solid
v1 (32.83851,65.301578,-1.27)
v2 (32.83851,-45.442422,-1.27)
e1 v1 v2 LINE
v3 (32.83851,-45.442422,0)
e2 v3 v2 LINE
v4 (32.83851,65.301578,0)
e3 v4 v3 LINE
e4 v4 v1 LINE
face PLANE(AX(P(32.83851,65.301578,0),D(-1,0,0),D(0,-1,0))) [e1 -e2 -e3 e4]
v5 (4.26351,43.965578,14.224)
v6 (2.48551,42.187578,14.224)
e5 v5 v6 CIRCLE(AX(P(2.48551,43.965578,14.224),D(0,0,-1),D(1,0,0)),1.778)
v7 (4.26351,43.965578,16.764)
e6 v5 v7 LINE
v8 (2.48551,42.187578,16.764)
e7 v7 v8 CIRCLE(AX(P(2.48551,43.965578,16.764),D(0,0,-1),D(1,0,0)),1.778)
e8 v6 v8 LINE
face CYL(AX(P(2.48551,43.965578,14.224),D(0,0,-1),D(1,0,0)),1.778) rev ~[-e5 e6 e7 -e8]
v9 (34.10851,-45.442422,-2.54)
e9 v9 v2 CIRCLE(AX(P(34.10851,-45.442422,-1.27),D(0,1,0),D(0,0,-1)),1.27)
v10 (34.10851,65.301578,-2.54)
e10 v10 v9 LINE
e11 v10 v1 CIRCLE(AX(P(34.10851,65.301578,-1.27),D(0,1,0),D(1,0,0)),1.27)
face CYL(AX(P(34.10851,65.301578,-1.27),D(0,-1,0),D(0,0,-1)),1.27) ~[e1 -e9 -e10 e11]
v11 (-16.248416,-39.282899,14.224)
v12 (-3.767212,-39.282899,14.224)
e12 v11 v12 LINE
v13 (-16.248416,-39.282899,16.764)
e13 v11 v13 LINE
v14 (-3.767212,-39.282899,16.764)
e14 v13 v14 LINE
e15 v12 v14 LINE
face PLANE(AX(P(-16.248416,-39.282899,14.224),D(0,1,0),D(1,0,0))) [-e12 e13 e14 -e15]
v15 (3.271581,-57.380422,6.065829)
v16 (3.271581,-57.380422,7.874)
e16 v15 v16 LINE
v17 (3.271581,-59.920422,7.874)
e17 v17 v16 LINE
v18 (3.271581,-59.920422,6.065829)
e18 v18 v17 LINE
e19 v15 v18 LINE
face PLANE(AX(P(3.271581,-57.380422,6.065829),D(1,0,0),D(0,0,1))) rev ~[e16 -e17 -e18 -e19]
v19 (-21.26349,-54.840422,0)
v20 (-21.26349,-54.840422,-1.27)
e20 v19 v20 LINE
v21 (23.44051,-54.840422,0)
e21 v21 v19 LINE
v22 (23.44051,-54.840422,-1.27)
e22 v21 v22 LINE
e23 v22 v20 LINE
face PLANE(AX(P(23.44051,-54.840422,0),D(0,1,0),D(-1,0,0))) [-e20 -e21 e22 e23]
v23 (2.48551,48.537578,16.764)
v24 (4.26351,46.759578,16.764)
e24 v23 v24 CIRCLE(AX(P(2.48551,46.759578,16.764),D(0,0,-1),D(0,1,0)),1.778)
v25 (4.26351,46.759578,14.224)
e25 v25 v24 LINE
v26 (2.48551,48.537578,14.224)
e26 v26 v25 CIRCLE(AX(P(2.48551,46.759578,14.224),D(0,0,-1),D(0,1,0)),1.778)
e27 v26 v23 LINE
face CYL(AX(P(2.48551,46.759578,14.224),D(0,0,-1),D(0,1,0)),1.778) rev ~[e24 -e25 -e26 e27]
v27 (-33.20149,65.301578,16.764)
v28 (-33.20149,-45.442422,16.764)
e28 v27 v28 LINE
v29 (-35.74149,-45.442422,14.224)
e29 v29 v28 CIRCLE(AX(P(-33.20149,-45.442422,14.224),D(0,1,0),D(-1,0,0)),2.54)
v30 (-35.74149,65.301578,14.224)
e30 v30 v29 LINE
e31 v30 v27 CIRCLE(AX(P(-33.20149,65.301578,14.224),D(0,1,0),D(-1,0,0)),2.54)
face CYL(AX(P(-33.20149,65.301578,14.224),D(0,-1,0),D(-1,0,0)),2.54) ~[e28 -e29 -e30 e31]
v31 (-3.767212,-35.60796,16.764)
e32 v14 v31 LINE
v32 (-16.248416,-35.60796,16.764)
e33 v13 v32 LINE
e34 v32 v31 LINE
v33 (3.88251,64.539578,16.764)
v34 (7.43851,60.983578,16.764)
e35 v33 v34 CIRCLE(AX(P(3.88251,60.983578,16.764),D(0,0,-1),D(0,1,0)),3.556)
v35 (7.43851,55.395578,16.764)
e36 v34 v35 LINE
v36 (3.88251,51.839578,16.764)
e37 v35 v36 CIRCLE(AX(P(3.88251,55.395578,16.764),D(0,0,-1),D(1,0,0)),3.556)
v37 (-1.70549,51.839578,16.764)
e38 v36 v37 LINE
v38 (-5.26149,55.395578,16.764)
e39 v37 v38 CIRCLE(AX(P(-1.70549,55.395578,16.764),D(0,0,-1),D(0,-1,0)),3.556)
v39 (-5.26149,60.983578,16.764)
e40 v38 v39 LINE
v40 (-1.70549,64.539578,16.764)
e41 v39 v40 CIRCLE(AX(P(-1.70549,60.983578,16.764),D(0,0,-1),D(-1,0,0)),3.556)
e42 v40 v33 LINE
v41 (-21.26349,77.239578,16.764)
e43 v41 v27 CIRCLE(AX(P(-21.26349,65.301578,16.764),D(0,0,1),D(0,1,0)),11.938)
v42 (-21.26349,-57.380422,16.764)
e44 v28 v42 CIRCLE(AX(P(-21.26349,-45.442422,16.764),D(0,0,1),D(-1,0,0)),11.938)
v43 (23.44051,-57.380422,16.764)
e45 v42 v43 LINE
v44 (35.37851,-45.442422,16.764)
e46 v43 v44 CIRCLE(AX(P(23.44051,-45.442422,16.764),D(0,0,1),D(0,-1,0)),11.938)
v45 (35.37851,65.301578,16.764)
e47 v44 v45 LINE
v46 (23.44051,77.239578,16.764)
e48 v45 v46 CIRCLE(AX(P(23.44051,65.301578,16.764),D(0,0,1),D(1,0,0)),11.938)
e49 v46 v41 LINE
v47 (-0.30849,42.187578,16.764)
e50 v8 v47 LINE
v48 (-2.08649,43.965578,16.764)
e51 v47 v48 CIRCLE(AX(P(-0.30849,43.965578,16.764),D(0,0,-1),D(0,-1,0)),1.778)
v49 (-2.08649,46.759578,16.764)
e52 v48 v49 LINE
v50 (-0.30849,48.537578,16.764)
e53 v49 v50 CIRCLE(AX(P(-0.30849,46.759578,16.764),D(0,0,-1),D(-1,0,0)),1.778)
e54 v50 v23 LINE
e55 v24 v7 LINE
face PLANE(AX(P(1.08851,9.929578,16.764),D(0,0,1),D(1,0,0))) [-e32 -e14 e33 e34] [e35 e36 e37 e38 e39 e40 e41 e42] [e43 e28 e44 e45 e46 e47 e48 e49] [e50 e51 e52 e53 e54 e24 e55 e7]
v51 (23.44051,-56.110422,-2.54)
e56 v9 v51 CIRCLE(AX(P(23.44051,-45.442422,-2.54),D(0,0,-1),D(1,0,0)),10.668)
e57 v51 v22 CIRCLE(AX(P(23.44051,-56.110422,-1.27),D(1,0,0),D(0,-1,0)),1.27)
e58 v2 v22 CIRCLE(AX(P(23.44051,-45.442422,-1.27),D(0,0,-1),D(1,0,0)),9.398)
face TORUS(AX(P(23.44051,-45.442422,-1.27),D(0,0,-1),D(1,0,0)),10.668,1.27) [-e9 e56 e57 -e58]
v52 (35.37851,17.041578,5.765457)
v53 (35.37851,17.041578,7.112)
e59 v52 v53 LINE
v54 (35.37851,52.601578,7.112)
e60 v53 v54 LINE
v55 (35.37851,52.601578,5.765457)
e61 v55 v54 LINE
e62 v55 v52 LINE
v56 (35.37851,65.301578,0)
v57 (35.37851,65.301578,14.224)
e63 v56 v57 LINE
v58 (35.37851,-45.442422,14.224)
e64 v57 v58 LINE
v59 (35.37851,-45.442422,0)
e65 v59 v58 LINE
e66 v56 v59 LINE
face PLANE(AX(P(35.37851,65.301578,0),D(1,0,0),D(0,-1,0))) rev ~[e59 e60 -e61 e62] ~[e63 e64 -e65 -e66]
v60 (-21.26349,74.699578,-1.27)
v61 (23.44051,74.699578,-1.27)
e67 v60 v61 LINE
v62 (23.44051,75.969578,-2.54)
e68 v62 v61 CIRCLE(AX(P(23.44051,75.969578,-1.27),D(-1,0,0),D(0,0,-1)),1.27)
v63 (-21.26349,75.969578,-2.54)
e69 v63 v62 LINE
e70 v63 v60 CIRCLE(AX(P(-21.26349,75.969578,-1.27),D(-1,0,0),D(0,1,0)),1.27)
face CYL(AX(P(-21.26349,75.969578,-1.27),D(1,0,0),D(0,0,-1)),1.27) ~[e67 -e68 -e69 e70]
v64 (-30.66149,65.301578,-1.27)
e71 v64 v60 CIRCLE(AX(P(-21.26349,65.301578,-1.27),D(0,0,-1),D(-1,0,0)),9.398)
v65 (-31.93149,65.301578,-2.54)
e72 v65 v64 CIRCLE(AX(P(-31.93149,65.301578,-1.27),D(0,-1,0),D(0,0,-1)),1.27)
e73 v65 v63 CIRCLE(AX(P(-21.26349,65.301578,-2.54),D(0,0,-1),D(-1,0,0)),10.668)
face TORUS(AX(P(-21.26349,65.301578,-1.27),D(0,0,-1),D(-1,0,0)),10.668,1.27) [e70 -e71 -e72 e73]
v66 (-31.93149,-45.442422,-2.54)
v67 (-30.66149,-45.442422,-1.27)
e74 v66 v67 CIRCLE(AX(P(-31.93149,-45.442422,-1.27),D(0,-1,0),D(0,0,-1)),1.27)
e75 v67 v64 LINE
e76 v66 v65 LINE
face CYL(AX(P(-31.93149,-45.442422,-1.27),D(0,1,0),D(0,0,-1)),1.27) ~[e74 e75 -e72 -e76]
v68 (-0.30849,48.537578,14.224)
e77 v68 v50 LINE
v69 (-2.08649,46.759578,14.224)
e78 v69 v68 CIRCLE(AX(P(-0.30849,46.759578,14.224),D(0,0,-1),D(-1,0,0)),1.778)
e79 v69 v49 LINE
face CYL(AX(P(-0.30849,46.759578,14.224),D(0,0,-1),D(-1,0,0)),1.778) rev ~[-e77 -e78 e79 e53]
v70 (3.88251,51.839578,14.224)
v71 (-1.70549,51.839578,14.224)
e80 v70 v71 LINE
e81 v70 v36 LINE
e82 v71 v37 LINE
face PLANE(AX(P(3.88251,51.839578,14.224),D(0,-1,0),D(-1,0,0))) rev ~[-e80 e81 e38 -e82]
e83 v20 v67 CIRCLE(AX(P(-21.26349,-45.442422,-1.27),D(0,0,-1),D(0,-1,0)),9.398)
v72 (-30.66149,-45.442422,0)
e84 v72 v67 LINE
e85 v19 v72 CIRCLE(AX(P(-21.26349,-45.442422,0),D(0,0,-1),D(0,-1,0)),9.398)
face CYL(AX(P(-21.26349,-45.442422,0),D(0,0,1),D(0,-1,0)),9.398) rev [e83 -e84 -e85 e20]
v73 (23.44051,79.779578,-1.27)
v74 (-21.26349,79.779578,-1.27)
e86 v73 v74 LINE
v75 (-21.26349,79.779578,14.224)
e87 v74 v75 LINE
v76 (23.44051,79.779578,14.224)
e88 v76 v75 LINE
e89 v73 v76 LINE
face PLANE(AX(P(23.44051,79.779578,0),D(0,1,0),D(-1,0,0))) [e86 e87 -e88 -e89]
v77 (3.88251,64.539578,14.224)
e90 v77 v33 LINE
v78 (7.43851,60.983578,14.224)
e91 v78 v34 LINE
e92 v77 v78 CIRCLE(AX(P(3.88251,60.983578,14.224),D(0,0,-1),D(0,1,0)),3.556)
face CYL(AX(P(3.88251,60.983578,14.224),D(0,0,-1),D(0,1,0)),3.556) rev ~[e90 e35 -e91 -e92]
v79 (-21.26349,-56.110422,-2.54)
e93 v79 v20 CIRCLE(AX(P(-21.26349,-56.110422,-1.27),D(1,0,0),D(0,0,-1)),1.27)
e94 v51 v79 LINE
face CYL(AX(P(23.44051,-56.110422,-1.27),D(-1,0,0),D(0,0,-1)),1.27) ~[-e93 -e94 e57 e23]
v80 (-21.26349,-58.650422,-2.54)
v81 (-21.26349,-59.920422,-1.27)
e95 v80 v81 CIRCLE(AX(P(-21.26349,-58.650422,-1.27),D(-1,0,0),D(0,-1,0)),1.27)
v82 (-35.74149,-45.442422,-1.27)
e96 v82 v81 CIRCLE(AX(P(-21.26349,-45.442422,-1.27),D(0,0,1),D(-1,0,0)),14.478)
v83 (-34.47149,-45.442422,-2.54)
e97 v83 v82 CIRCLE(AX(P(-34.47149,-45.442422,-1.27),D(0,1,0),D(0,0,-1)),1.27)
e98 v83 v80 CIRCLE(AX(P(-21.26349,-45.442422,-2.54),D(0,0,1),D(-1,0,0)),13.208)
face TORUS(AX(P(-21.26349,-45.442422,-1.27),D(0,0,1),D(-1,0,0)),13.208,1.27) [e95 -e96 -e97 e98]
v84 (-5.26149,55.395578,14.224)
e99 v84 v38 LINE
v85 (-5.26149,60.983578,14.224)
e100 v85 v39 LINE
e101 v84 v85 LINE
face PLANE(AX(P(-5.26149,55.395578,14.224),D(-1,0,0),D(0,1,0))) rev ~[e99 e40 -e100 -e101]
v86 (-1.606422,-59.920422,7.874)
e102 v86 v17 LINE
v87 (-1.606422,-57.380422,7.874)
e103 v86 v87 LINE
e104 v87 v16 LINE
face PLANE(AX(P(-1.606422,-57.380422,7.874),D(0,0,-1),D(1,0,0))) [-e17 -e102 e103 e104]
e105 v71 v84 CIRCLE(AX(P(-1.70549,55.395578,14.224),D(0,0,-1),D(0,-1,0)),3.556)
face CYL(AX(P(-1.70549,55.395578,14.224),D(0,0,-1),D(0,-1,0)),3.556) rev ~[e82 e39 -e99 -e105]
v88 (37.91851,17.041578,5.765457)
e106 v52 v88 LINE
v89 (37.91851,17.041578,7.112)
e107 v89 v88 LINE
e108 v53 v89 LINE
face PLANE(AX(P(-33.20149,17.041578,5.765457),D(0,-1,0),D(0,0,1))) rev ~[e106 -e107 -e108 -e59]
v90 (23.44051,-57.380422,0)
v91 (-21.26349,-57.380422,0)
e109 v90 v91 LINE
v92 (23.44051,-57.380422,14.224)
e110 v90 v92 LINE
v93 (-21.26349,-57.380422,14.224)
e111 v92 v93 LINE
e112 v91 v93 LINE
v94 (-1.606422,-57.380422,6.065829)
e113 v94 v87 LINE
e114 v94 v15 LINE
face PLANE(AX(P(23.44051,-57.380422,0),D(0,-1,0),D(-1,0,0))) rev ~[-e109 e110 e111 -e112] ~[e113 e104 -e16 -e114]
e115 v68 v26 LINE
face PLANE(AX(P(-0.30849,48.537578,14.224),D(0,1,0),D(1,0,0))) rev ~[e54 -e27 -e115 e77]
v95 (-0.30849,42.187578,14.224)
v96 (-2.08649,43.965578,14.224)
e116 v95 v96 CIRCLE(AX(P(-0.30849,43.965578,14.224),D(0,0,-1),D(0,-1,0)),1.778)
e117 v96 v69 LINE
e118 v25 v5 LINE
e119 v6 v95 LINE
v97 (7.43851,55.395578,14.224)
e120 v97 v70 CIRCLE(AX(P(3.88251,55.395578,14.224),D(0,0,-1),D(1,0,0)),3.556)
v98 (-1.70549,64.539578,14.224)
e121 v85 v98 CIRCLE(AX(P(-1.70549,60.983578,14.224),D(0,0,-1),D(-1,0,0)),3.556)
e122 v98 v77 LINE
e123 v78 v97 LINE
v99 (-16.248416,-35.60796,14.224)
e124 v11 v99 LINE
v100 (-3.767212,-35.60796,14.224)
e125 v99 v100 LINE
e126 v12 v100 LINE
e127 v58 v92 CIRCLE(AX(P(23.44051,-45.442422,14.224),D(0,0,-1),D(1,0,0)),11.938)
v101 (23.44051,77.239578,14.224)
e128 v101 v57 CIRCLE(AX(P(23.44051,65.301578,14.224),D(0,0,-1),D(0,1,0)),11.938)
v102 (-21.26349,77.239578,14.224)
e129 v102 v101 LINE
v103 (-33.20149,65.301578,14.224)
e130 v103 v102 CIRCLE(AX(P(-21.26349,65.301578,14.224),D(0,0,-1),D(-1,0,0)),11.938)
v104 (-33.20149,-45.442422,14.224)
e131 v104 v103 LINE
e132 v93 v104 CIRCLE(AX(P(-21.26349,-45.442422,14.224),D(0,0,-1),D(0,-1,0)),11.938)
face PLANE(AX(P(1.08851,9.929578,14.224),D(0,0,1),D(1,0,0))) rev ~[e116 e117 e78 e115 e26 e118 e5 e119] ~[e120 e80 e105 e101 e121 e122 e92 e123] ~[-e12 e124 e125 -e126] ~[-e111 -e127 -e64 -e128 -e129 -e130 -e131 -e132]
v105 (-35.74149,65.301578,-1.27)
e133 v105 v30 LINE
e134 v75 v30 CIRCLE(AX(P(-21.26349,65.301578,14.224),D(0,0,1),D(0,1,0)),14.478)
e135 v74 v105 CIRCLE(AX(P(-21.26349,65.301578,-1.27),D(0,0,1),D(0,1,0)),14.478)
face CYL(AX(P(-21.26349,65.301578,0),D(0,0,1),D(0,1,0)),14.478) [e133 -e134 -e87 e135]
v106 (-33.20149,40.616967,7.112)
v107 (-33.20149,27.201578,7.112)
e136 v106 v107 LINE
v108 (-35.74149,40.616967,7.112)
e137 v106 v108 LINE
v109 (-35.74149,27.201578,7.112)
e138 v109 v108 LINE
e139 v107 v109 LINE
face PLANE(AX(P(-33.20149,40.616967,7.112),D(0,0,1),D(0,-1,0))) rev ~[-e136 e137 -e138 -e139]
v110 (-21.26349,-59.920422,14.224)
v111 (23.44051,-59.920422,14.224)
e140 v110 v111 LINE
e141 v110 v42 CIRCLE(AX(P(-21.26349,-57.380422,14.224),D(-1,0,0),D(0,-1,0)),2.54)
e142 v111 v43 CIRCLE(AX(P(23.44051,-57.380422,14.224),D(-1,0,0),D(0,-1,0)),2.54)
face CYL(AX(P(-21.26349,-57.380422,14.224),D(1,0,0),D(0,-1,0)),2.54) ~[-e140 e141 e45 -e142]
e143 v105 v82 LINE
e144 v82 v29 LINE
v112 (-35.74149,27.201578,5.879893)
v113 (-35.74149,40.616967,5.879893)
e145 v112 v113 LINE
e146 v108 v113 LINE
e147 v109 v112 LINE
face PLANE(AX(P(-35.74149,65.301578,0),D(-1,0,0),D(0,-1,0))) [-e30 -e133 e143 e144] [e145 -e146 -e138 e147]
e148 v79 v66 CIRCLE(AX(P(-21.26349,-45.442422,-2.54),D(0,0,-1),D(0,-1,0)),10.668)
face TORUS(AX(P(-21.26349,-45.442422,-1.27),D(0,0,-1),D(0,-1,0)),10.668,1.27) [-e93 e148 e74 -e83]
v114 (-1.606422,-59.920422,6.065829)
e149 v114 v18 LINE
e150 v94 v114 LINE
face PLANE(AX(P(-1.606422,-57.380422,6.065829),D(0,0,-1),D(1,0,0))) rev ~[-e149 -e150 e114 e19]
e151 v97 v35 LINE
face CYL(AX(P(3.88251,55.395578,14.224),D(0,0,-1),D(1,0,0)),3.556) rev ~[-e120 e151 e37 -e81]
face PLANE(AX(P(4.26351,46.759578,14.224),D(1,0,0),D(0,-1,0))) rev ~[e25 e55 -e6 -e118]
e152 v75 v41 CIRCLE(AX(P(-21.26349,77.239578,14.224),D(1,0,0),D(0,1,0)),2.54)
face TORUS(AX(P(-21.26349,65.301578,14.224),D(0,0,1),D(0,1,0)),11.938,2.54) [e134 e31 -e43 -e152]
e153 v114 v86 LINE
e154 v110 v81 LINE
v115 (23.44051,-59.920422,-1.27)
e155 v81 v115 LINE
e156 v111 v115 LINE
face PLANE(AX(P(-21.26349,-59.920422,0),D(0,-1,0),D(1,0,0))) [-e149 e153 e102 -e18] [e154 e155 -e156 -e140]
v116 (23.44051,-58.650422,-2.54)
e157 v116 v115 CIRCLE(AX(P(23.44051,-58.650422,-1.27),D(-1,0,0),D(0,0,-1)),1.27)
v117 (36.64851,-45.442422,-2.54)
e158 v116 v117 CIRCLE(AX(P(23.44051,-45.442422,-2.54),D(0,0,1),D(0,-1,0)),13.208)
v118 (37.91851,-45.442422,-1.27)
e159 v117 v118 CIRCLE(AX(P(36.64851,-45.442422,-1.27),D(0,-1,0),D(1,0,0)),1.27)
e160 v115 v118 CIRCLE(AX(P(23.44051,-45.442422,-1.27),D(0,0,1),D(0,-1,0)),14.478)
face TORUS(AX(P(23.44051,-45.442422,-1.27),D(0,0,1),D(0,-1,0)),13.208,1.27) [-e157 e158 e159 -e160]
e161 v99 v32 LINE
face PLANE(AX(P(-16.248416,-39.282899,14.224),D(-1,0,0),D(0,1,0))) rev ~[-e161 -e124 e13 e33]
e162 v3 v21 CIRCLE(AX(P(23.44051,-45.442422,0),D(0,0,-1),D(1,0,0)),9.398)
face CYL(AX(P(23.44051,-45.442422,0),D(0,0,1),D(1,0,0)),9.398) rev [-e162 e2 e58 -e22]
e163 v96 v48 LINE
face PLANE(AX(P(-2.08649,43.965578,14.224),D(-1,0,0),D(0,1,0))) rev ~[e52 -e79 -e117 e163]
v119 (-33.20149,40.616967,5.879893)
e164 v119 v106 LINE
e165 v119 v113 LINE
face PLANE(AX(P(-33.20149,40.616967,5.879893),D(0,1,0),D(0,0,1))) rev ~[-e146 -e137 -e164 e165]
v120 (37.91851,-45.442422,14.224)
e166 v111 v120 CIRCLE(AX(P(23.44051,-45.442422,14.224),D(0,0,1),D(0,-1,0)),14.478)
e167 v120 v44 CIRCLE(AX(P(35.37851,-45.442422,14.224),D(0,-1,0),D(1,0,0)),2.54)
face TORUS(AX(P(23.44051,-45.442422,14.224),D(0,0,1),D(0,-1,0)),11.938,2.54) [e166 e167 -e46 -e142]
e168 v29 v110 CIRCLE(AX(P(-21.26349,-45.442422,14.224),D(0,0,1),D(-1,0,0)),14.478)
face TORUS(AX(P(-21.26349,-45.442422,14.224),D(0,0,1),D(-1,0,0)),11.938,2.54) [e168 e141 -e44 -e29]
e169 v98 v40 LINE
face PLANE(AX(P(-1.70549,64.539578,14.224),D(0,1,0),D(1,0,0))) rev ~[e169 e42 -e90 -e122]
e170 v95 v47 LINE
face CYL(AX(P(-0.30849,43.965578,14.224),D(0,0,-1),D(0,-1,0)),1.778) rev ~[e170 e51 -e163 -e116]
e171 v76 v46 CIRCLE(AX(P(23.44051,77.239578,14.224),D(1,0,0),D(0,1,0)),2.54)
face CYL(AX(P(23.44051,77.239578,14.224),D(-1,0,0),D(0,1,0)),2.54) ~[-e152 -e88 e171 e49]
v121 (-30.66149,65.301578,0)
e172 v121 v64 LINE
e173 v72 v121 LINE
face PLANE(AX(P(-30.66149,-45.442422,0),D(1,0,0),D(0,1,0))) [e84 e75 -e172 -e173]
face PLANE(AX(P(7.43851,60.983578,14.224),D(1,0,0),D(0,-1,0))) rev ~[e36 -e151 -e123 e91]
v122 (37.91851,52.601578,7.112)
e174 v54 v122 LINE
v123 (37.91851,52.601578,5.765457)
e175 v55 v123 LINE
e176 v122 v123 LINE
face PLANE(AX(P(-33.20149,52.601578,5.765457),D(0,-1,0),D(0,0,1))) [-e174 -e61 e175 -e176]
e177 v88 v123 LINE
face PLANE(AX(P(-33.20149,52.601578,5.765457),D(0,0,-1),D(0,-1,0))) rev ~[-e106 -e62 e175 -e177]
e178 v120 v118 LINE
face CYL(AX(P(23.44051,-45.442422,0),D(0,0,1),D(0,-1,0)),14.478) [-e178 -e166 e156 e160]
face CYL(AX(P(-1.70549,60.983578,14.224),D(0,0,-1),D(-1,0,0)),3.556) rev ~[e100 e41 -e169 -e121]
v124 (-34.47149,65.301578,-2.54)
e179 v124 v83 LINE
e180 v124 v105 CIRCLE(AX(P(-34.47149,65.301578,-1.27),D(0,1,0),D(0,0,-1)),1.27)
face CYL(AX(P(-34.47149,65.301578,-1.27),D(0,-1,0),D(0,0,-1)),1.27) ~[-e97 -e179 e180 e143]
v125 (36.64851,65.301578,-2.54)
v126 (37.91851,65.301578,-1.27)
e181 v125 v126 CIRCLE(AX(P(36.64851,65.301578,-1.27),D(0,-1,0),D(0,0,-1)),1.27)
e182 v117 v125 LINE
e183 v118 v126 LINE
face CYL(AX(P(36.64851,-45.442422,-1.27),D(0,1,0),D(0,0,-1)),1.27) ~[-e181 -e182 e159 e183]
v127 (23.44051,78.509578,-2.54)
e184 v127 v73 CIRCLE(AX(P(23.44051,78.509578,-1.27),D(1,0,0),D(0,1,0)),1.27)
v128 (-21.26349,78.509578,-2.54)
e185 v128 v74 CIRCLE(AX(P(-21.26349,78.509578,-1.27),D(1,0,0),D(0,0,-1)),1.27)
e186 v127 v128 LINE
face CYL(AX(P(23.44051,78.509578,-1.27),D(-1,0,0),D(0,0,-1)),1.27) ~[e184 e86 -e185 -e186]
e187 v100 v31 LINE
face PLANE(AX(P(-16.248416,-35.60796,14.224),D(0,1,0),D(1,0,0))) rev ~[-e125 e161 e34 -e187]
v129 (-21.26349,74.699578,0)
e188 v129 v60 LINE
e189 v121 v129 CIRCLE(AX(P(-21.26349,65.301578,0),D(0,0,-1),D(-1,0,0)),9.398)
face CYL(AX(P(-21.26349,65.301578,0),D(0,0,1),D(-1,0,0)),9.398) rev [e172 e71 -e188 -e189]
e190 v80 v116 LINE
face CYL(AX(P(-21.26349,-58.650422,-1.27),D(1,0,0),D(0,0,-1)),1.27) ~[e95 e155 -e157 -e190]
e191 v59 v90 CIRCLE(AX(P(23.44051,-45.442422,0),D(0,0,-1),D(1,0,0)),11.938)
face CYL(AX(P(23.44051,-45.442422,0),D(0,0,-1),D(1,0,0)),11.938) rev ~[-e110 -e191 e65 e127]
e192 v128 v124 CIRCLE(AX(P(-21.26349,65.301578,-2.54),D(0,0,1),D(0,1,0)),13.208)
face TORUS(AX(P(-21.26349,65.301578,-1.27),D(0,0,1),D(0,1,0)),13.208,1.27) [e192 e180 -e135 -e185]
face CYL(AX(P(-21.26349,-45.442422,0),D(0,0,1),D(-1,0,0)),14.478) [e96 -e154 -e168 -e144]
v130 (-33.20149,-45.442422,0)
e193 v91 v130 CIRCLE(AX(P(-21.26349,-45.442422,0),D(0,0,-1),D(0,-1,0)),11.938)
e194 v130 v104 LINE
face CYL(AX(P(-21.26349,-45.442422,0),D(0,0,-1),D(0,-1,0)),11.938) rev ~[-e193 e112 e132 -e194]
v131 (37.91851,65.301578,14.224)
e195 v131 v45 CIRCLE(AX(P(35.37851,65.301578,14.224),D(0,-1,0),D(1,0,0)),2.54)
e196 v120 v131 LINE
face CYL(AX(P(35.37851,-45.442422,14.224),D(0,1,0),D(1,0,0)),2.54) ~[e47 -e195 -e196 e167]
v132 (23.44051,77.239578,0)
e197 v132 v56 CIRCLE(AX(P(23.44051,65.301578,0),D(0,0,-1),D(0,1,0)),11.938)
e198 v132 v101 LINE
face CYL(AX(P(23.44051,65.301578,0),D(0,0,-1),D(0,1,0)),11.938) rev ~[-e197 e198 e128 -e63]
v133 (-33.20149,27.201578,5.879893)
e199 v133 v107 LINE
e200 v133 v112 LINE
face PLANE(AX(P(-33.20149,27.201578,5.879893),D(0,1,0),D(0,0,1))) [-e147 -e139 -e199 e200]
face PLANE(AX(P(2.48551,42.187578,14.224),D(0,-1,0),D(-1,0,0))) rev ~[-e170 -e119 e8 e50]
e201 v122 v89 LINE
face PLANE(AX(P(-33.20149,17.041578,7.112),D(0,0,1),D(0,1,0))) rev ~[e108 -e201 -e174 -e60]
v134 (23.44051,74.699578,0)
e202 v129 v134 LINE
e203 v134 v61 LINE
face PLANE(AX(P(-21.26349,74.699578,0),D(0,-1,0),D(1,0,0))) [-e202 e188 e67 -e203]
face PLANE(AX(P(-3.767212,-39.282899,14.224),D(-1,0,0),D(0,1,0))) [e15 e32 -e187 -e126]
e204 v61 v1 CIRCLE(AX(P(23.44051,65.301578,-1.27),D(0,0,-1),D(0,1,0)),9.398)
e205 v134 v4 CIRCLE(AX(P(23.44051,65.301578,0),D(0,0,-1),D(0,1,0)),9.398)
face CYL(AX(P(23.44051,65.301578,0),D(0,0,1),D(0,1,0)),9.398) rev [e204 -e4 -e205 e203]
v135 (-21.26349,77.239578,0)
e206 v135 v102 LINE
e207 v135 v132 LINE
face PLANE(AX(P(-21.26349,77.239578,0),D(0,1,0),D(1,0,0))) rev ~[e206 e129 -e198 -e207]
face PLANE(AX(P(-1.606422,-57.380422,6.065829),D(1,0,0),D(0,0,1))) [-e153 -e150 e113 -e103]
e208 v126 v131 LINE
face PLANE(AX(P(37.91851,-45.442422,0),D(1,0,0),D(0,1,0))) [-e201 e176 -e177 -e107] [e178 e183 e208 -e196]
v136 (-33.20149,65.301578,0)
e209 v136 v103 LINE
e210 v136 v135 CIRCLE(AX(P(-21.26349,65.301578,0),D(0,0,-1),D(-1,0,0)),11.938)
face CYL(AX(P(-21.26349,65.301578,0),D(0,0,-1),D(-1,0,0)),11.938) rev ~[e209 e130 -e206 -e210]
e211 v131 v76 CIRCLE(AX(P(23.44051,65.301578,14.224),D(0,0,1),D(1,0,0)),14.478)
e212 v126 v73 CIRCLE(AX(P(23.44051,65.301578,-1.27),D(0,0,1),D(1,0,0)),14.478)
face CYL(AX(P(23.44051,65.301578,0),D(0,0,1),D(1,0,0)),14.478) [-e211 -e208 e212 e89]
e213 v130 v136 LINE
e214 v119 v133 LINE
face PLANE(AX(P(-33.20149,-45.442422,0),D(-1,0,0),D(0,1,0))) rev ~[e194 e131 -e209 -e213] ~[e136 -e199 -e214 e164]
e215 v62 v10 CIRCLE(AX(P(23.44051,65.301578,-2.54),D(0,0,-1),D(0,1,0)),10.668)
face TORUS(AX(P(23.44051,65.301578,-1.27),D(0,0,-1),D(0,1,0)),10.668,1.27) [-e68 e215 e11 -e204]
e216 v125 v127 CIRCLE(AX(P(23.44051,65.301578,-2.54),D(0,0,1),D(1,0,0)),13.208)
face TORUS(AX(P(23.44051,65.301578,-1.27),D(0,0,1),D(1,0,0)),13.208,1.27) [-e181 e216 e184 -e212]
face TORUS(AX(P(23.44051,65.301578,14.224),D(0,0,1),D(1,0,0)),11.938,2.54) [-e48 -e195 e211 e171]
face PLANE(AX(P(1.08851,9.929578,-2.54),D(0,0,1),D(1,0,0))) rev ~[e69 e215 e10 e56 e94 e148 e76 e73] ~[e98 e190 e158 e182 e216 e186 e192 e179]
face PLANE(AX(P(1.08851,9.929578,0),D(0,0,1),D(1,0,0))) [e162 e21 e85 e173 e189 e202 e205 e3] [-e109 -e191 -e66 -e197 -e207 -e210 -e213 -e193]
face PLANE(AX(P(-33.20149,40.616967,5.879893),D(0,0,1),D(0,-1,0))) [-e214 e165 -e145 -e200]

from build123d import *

# Parameters (mm, degrees)
F1_DEPTH   = 14.224
F2_W       = 16.002
F2_H       = 1.3465428281
F2_W_2     = 9.398
F2_W_3     = 10.16
F3_DEPTH   = 76.2
F4_W       = 13.4153888345
F4_H       = 1.2321065667
F5_DEPTH   = 25.4
F7_DEPTH   = 14.224
F1_FACE2_W = 12.4812044669
F1_FACE2_H = 3.6749392748
F8_DEPTH   = 2.54
F9_DEPTH   = 2.54
F11_R      = 1.27
F6_W       = 4.8780030338
F6_H       = 1.8081708086
F12_DEPTH  = 7.1882
F13_R      = 2.54


with BuildPart() as f1:
    # F0 (on Top) → F1 (new body)
    with BuildSketch(Plane.XY):
        with BuildLine():
            Line((1.0885104024, 77.2395779495), (-21.2634895976, 77.2395779495))
            ThreePointArc((-21.2634895976, 77.2395779495), (-29.7049303514, 73.7430187033), (-33.2014895976, 65.3015779495))
            Line((-33.2014895976, 65.3015779495), (-33.2014895976, -45.4424220505))
            ThreePointArc((-33.2014895976, -45.4424220505), (-29.7049303514, -53.8838628043), (-21.2634895976, -57.3804220505))
            Line((-21.2634895976, -57.3804220505), (1.0885104024, -57.3804220505))
            Line((1.0885104024, -57.3804220505), (1.0885104024, -54.8404220505))
            Line((1.0885104024, -54.8404220505), (-21.2634895976, -54.8404220505))
            ThreePointArc((-21.2634895976, -54.8404220505), (-27.9088791272, -52.0878115801), (-30.6614895976, -45.4424220505))
            Line((-30.6614895976, -45.4424220505), (-30.6614895976, 65.3015779495))
            ThreePointArc((-30.6614895976, 65.3015779495), (-27.9088791272, 71.9469674791), (-21.2634895976, 74.6995779495))
            Line((-21.2634895976, 74.6995779495), (1.0885104024, 74.6995779495))
            Line((1.0885104024, 74.6995779495), (1.0885104024, 77.2395779495))
        make_face()
        with BuildLine():
            Line((23.4405104024, 77.2395779495), (1.0885104024, 77.2395779495))
            Line((1.0885104024, 77.2395779495), (1.0885104024, 74.6995779495))
            Line((1.0885104024, 74.6995779495), (23.4405104024, 74.6995779495))
            ThreePointArc((23.4405104024, 74.6995779495), (30.085899932, 71.9469674791), (32.8385104024, 65.3015779495))
            Line((32.8385104024, 65.3015779495), (32.8385104024, -45.4424220505))
            ThreePointArc((32.8385104024, -45.4424220505), (30.085899932, -52.0878115801), (23.4405104024, -54.8404220505))
            Line((23.4405104024, -54.8404220505), (1.0885104024, -54.8404220505))
            Line((1.0885104024, -54.8404220505), (1.0885104024, -57.3804220505))
            Line((1.0885104024, -57.3804220505), (23.4405104024, -57.3804220505))
            ThreePointArc((23.4405104024, -57.3804220505), (31.8819511562, -53.8838628043), (35.3785104024, -45.4424220505))
            Line((35.3785104024, -45.4424220505), (35.3785104024, 65.3015779495))
            ThreePointArc((35.3785104024, 65.3015779495), (31.8819511562, 73.7430187033), (23.4405104024, 77.2395779495))
        make_face()
        with BuildLine():
            Line((23.4405104024, 74.6995779495), (1.0885104024, 74.6995779495))
            Line((1.0885104024, 74.6995779495), (1.0885104024, 64.5395779495))
            Line((1.0885104024, 64.5395779495), (3.8825104024, 64.5395779495))
            ThreePointArc((3.8825104024, 64.5395779495), (6.3969821163, 63.4980496634), (7.4385104024, 60.9835779495))
            Line((7.4385104024, 60.9835779495), (7.4385104024, 55.3955779495))
            ThreePointArc((7.4385104024, 55.3955779495), (6.3969821163, 52.8811062356), (3.8825104024, 51.8395779495))
            Line((3.8825104024, 51.8395779495), (1.0885104024, 51.8395779495))
            Line((1.0885104024, 51.8395779495), (1.0885104024, 48.5375779495))
            Line((1.0885104024, 48.5375779495), (2.4855104024, 48.5375779495))
            ThreePointArc((2.4855104024, 48.5375779495), (3.7427462594, 48.0168138065), (4.2635104024, 46.7595779495))
            Line((4.2635104024, 46.7595779495), (4.2635104024, 43.9655779495))
            ThreePointArc((4.2635104024, 43.9655779495), (3.7427462594, 42.7083420926), (2.4855104024, 42.1875779495))
            Line((2.4855104024, 42.1875779495), (1.0885104024, 42.1875779495))
            Line((1.0885104024, 42.1875779495), (1.0885104024, -54.8404220505))
            Line((1.0885104024, -54.8404220505), (23.4405104024, -54.8404220505))
            ThreePointArc((23.4405104024, -54.8404220505), (30.085899932, -52.0878115801), (32.8385104024, -45.4424220505))
            Line((32.8385104024, -45.4424220505), (32.8385104024, 65.3015779495))
            ThreePointArc((32.8385104024, 65.3015779495), (30.085899932, 71.9469674791), (23.4405104024, 74.6995779495))
        make_face()
        with BuildLine():
            Line((1.0885104024, 64.5395779495), (1.0885104024, 74.6995779495))
            Line((1.0885104024, 74.6995779495), (-21.2634895976, 74.6995779495))
            ThreePointArc((-21.2634895976, 74.6995779495), (-27.9088791272, 71.9469674791), (-30.6614895976, 65.3015779495))
            Line((-30.6614895976, 65.3015779495), (-30.6614895976, -45.4424220505))
            ThreePointArc((-30.6614895976, -45.4424220505), (-27.9088791272, -52.0878115801), (-21.2634895976, -54.8404220505))
            Line((-21.2634895976, -54.8404220505), (1.0885104024, -54.8404220505))
            Line((1.0885104024, -54.8404220505), (1.0885104024, 42.1875779495))
            Line((1.0885104024, 42.1875779495), (-0.3084895976, 42.1875779495))
            ThreePointArc((-0.3084895976, 42.1875779495), (-1.5657254545, 42.7083420926), (-2.0864895976, 43.9655779495))
            Line((-2.0864895976, 43.9655779495), (-2.0864895976, 46.7595779495))
            ThreePointArc((-2.0864895976, 46.7595779495), (-1.5657254545, 48.0168138065), (-0.3084895976, 48.5375779495))
            Line((-0.3084895976, 48.5375779495), (1.0885104024, 48.5375779495))
            Line((1.0885104024, 48.5375779495), (1.0885104024, 51.8395779495))
            Line((1.0885104024, 51.8395779495), (-1.7054895976, 51.8395779495))
            ThreePointArc((-1.7054895976, 51.8395779495), (-4.2199613115, 52.8811062356), (-5.2614895976, 55.3955779495))
            Line((-5.2614895976, 55.3955779495), (-5.2614895976, 60.9835779495))
            ThreePointArc((-5.2614895976, 60.9835779495), (-4.2199613115, 63.4980496634), (-1.7054895976, 64.5395779495))
            Line((-1.7054895976, 64.5395779495), (1.0885104024, 64.5395779495))
        make_face()
        Polygon((-16.2484161556, -39.2828993499), (-16.2484161556, -37.4030255506), (-16.2484161556, -35.6079600751), (-3.7672116887, -35.6079600751), (-3.7672116887, -39.2828993499), align=None, mode=Mode.SUBTRACT)
    extrude(amount=F1_DEPTH)

    # F2 (on face) → F3 (join)
    with BuildSketch(Plane(origin=(-33.2014895976, 0, 0), x_dir=(0, -1, 0), z_dir=(-1, 0, 0))):
        with Locations((-44.6005779495, 6.438728586)):
            Rectangle(F2_W, F2_H)
        with Locations((-31.9005779495, 6.438728586)):
            Rectangle(F2_W_2, F2_H)
        with Locations((-22.1215779495, 6.438728586)):
            Rectangle(F2_W_3, F2_H)
    extrude(amount=-F3_DEPTH)

    # F4 (on face) → F5 (join)
    with BuildSketch(Plane(origin=(-33.2014895976, 0, 0), x_dir=(0, -1, 0), z_dir=(-1, 0, 0))):
        with Locations((-33.9092723668, 6.4959467167)):
            Rectangle(F4_W, F4_H)
    extrude(amount=F5_DEPTH)


with BuildPart() as f7:
    # F0 (on Top) → F7 (new body)
    with BuildSketch(Plane.XY):
        with BuildLine():
            Line((37.9185104024, -45.4424220505), (37.9185104024, 65.3015779495))
            ThreePointArc((37.9185104024, 65.3015779495), (33.6780023805, 75.5390699275), (23.4405104024, 79.7795779495))
            Line((23.4405104024, 79.7795779495), (-21.2634895976, 79.7795779495))
            ThreePointArc((-21.2634895976, 79.7795779495), (-31.5009815756, 75.5390699275), (-35.7414895976, 65.3015779495))
            Line((-35.7414895976, 65.3015779495), (-35.7414895976, -45.4424220505))
            ThreePointArc((-35.7414895976, -45.4424220505), (-31.5009815756, -55.6799140285), (-21.2634895976, -59.9204220505))
            Line((-21.2634895976, -59.9204220505), (23.4405104024, -59.9204220505))
            ThreePointArc((23.4405104024, -59.9204220505), (33.6780023805, -55.6799140285), (37.9185104024, -45.4424220505))
        make_face()
        with BuildLine():
            ThreePointArc((-33.2014895976, 65.3015779495), (-29.7049303514, 73.7430187033), (-21.2634895976, 77.2395779495))
            Line((-21.2634895976, 77.2395779495), (1.0885104024, 77.2395779495))
            Line((1.0885104024, 77.2395779495), (23.4405104024, 77.2395779495))
            ThreePointArc((23.4405104024, 77.2395779495), (31.8819511562, 73.7430187033), (35.3785104024, 65.3015779495))
            Line((35.3785104024, 65.3015779495), (35.3785104024, -45.4424220505))
            ThreePointArc((35.3785104024, -45.4424220505), (31.8819511562, -53.8838628043), (23.4405104024, -57.3804220505))
            Line((23.4405104024, -57.3804220505), (1.0885104024, -57.3804220505))
            Line((1.0885104024, -57.3804220505), (-21.2634895976, -57.3804220505))
            ThreePointArc((-21.2634895976, -57.3804220505), (-29.7049303514, -53.8838628043), (-33.2014895976, -45.4424220505))
            Line((-33.2014895976, -45.4424220505), (-33.2014895976, 65.3015779495))
        make_face(mode=Mode.SUBTRACT)
    extrude(amount=F7_DEPTH)

    # F7_face (on face) + F1_face2 (on face) → F8 (join)
    with BuildSketch(Plane(origin=(1.0885104024, 9.9295779495, 14.224), x_dir=(1, 0, 0), z_dir=(0, 0, 1))):
        with BuildLine():
            ThreePointArc((22.352, -69.85), (32.589491978, -65.609491978), (36.83, -55.372))
            Line((36.83, -55.372), (36.83, 55.372))
            ThreePointArc((36.83, 55.372), (32.589491978, 65.609491978), (22.352, 69.85))
            Line((22.352, 69.85), (-22.352, 69.85))
            ThreePointArc((-22.352, 69.85), (-32.589491978, 65.609491978), (-36.83, 55.372))
            Line((-36.83, 55.372), (-36.83, -55.372))
            ThreePointArc((-36.83, -55.372), (-32.589491978, -65.609491978), (-22.352, -69.85))
            Line((-22.352, -69.85), (22.352, -69.85))
        make_face()
        with BuildLine():
            ThreePointArc((-34.29, 55.372), (-30.7934407538, 63.8134407538), (-22.352, 67.31))
            Line((-22.352, 67.31), (22.352, 67.31))
            ThreePointArc((22.352, 67.31), (30.7934407538, 63.8134407538), (34.29, 55.372))
            Line((34.29, 55.372), (34.29, -55.372))
            ThreePointArc((34.29, -55.372), (30.7934407538, -63.8134407538), (22.352, -67.31))
            Line((22.352, -67.31), (-22.352, -67.31))
            ThreePointArc((-22.352, -67.31), (-30.7934407538, -63.8134407538), (-34.29, -55.372))
            Line((-34.29, -55.372), (-34.29, 55.372))
        make_face(mode=Mode.SUBTRACT)
    with BuildSketch(Plane(origin=(1.1458518889, 9.2063211199, 14.224), x_dir=(1, 0, 0), z_dir=(0, 0, 1))):
        with BuildLine():
            ThreePointArc((-22.4093414865, 68.0332568296), (-30.8507822403, 64.5366975834), (-34.3473414865, 56.0952568296))
            Line((-34.3473414865, 56.0952568296), (-34.3473414865, -54.6487431704))
            ThreePointArc((-34.3473414865, -54.6487431704), (-30.8507822403, -63.0901839242), (-22.4093414865, -66.5867431704))
            Line((-22.4093414865, -66.5867431704), (22.2946585135, -66.5867431704))
            ThreePointArc((22.2946585135, -66.5867431704), (30.7360992673, -63.0901839242), (34.2326585135, -54.6487431704))
            Line((34.2326585135, -54.6487431704), (34.2326585135, 56.0952568296))
            ThreePointArc((34.2326585135, 56.0952568296), (30.7360992673, 64.5366975834), (22.2946585135, 68.0332568296))
            Line((22.2946585135, 68.0332568296), (-22.4093414865, 68.0332568296))
        make_face()
        with BuildLine():
            ThreePointArc((2.7366585135, 55.3332568296), (5.2511302274, 54.2917285435), (6.2926585135, 51.7772568296))
            Line((6.2926585135, 51.7772568296), (6.2926585135, 46.1892568296))
            ThreePointArc((6.2926585135, 46.1892568296), (5.2511302274, 43.6747851157), (2.7366585135, 42.6332568296))
            Line((2.7366585135, 42.6332568296), (-2.8513414865, 42.6332568296))
            ThreePointArc((-2.8513414865, 42.6332568296), (-5.3658132004, 43.6747851157), (-6.4073414865, 46.1892568296))
            Line((-6.4073414865, 46.1892568296), (-6.4073414865, 51.7772568296))
            ThreePointArc((-6.4073414865, 51.7772568296), (-5.3658132004, 54.2917285435), (-2.8513414865, 55.3332568296))
            Line((-2.8513414865, 55.3332568296), (2.7366585135, 55.3332568296))
        make_face(mode=Mode.SUBTRACT)
        with BuildLine():
            ThreePointArc((1.3396585135, 39.3312568296), (2.5968943705, 38.8104926866), (3.1176585135, 37.5532568296))
            Line((3.1176585135, 37.5532568296), (3.1176585135, 34.7592568296))
            ThreePointArc((3.1176585135, 34.7592568296), (2.5968943705, 33.5020209727), (1.3396585135, 32.9812568296))
            Line((1.3396585135, 32.9812568296), (-1.4543414865, 32.9812568296))
            ThreePointArc((-1.4543414865, 32.9812568296), (-2.7115773434, 33.5020209727), (-3.2323414865, 34.7592568296))
            Line((-3.2323414865, 34.7592568296), (-3.2323414865, 37.5532568296))
            ThreePointArc((-3.2323414865, 37.5532568296), (-2.7115773434, 38.8104926866), (-1.4543414865, 39.3312568296))
            Line((-1.4543414865, 39.3312568296), (1.3396585135, 39.3312568296))
        make_face(mode=Mode.SUBTRACT)
        with Locations((-11.1536658111, -46.6517508324)):
            Rectangle(F1_FACE2_W, F1_FACE2_H, mode=Mode.SUBTRACT)
    extrude(amount=F8_DEPTH)

    # F0 (on Top) → F9 (join)
    with BuildSketch(Plane.XY):
        with BuildLine():
            Line((37.9185104024, -45.4424220505), (37.9185104024, 65.3015779495))
            ThreePointArc((37.9185104024, 65.3015779495), (33.6780023805, 75.5390699275), (23.4405104024, 79.7795779495))
            Line((23.4405104024, 79.7795779495), (-21.2634895976, 79.7795779495))
            ThreePointArc((-21.2634895976, 79.7795779495), (-31.5009815756, 75.5390699275), (-35.7414895976, 65.3015779495))
            Line((-35.7414895976, 65.3015779495), (-35.7414895976, -45.4424220505))
            ThreePointArc((-35.7414895976, -45.4424220505), (-31.5009815756, -55.6799140285), (-21.2634895976, -59.9204220505))
            Line((-21.2634895976, -59.9204220505), (23.4405104024, -59.9204220505))
            ThreePointArc((23.4405104024, -59.9204220505), (33.6780023805, -55.6799140285), (37.9185104024, -45.4424220505))
        make_face()
        with BuildLine():
            ThreePointArc((-33.2014895976, 65.3015779495), (-29.7049303514, 73.7430187033), (-21.2634895976, 77.2395779495))
            Line((-21.2634895976, 77.2395779495), (1.0885104024, 77.2395779495))
            Line((1.0885104024, 77.2395779495), (23.4405104024, 77.2395779495))
            ThreePointArc((23.4405104024, 77.2395779495), (31.8819511562, 73.7430187033), (35.3785104024, 65.3015779495))
            Line((35.3785104024, 65.3015779495), (35.3785104024, -45.4424220505))
            ThreePointArc((35.3785104024, -45.4424220505), (31.8819511562, -53.8838628043), (23.4405104024, -57.3804220505))
            Line((23.4405104024, -57.3804220505), (1.0885104024, -57.3804220505))
            Line((1.0885104024, -57.3804220505), (-21.2634895976, -57.3804220505))
            ThreePointArc((-21.2634895976, -57.3804220505), (-29.7049303514, -53.8838628043), (-33.2014895976, -45.4424220505))
            Line((-33.2014895976, -45.4424220505), (-33.2014895976, 65.3015779495))
        make_face(mode=Mode.SUBTRACT)
        with BuildLine():
            Line((23.4405104024, 77.2395779495), (1.0885104024, 77.2395779495))
            Line((1.0885104024, 77.2395779495), (1.0885104024, 74.6995779495))
            Line((1.0885104024, 74.6995779495), (23.4405104024, 74.6995779495))
            ThreePointArc((23.4405104024, 74.6995779495), (30.085899932, 71.9469674791), (32.8385104024, 65.3015779495))
            Line((32.8385104024, 65.3015779495), (32.8385104024, -45.4424220505))
            ThreePointArc((32.8385104024, -45.4424220505), (30.085899932, -52.0878115801), (23.4405104024, -54.8404220505))
            Line((23.4405104024, -54.8404220505), (1.0885104024, -54.8404220505))
            Line((1.0885104024, -54.8404220505), (1.0885104024, -57.3804220505))
            Line((1.0885104024, -57.3804220505), (23.4405104024, -57.3804220505))
            ThreePointArc((23.4405104024, -57.3804220505), (31.8819511562, -53.8838628043), (35.3785104024, -45.4424220505))
            Line((35.3785104024, -45.4424220505), (35.3785104024, 65.3015779495))
            ThreePointArc((35.3785104024, 65.3015779495), (31.8819511562, 73.7430187033), (23.4405104024, 77.2395779495))
        make_face()
        with BuildLine():
            Line((1.0885104024, 77.2395779495), (-21.2634895976, 77.2395779495))
            ThreePointArc((-21.2634895976, 77.2395779495), (-29.7049303514, 73.7430187033), (-33.2014895976, 65.3015779495))
            Line((-33.2014895976, 65.3015779495), (-33.2014895976, -45.4424220505))
            ThreePointArc((-33.2014895976, -45.4424220505), (-29.7049303514, -53.8838628043), (-21.2634895976, -57.3804220505))
            Line((-21.2634895976, -57.3804220505), (1.0885104024, -57.3804220505))
            Line((1.0885104024, -57.3804220505), (1.0885104024, -54.8404220505))
            Line((1.0885104024, -54.8404220505), (-21.2634895976, -54.8404220505))
            ThreePointArc((-21.2634895976, -54.8404220505), (-27.9088791272, -52.0878115801), (-30.6614895976, -45.4424220505))
            Line((-30.6614895976, -45.4424220505), (-30.6614895976, 65.3015779495))
            ThreePointArc((-30.6614895976, 65.3015779495), (-27.9088791272, 71.9469674791), (-21.2634895976, 74.6995779495))
            Line((-21.2634895976, 74.6995779495), (1.0885104024, 74.6995779495))
            Line((1.0885104024, 74.6995779495), (1.0885104024, 77.2395779495))
        make_face()
    extrude(amount=-F9_DEPTH)

    # F10: cut F1
    add(f1.part, mode=Mode.SUBTRACT)

    # F11
    f11_edges = [f7.edges().sort_by_distance(p)[0] for p in [
        (-30.66149, 9.929578, -2.54),
        (-35.74149, 9.929578, -2.54),
        (33.678002, -55.679914, -2.54),
        (1.08851, -59.920422, -2.54),
        (37.91851, 9.929578, -2.54),
        (33.678002, 75.53907, -2.54),
        (1.08851, 79.779578, -2.54),
        (-31.500982, 75.53907, -2.54),
        (-31.500982, -55.679914, -2.54),
        (30.0859, 71.946967, -2.54),
        (32.83851, 9.929578, -2.54),
        (30.0859, -52.087812, -2.54),
        (1.08851, -54.840422, -2.54),
        (-27.908879, -52.087812, -2.54),
        (-27.908879, 71.946967, -2.54),
        (1.08851, 74.699578, -2.54),
    ]]
    fillet(f11_edges, radius=F11_R)

    # F6 (on face) → F12 (cut, symmetric)
    with BuildSketch(Plane.XZ.offset(57.3804220505)):
        with Locations((0.8325793897, 6.9699145957)):
            Rectangle(F6_W, F6_H)
    extrude(amount=F12_DEPTH, both=True, mode=Mode.SUBTRACT)

    # F13
    f13_edges = [f7.edges().sort_by_distance(p)[0] for p in [
        (37.91851, 9.929578, 16.764),
        (33.678002, -55.679914, 16.764),
        (1.08851, -59.920422, 16.764),
        (33.678002, 75.53907, 16.764),
        (1.08851, 79.779578, 16.764),
        (-31.500982, 75.53907, 16.764),
        (-35.74149, 9.929578, 16.764),
        (-31.500982, -55.679914, 16.764),
    ]]
    fillet(f13_edges, radius=F13_R)


solid = f7.part
